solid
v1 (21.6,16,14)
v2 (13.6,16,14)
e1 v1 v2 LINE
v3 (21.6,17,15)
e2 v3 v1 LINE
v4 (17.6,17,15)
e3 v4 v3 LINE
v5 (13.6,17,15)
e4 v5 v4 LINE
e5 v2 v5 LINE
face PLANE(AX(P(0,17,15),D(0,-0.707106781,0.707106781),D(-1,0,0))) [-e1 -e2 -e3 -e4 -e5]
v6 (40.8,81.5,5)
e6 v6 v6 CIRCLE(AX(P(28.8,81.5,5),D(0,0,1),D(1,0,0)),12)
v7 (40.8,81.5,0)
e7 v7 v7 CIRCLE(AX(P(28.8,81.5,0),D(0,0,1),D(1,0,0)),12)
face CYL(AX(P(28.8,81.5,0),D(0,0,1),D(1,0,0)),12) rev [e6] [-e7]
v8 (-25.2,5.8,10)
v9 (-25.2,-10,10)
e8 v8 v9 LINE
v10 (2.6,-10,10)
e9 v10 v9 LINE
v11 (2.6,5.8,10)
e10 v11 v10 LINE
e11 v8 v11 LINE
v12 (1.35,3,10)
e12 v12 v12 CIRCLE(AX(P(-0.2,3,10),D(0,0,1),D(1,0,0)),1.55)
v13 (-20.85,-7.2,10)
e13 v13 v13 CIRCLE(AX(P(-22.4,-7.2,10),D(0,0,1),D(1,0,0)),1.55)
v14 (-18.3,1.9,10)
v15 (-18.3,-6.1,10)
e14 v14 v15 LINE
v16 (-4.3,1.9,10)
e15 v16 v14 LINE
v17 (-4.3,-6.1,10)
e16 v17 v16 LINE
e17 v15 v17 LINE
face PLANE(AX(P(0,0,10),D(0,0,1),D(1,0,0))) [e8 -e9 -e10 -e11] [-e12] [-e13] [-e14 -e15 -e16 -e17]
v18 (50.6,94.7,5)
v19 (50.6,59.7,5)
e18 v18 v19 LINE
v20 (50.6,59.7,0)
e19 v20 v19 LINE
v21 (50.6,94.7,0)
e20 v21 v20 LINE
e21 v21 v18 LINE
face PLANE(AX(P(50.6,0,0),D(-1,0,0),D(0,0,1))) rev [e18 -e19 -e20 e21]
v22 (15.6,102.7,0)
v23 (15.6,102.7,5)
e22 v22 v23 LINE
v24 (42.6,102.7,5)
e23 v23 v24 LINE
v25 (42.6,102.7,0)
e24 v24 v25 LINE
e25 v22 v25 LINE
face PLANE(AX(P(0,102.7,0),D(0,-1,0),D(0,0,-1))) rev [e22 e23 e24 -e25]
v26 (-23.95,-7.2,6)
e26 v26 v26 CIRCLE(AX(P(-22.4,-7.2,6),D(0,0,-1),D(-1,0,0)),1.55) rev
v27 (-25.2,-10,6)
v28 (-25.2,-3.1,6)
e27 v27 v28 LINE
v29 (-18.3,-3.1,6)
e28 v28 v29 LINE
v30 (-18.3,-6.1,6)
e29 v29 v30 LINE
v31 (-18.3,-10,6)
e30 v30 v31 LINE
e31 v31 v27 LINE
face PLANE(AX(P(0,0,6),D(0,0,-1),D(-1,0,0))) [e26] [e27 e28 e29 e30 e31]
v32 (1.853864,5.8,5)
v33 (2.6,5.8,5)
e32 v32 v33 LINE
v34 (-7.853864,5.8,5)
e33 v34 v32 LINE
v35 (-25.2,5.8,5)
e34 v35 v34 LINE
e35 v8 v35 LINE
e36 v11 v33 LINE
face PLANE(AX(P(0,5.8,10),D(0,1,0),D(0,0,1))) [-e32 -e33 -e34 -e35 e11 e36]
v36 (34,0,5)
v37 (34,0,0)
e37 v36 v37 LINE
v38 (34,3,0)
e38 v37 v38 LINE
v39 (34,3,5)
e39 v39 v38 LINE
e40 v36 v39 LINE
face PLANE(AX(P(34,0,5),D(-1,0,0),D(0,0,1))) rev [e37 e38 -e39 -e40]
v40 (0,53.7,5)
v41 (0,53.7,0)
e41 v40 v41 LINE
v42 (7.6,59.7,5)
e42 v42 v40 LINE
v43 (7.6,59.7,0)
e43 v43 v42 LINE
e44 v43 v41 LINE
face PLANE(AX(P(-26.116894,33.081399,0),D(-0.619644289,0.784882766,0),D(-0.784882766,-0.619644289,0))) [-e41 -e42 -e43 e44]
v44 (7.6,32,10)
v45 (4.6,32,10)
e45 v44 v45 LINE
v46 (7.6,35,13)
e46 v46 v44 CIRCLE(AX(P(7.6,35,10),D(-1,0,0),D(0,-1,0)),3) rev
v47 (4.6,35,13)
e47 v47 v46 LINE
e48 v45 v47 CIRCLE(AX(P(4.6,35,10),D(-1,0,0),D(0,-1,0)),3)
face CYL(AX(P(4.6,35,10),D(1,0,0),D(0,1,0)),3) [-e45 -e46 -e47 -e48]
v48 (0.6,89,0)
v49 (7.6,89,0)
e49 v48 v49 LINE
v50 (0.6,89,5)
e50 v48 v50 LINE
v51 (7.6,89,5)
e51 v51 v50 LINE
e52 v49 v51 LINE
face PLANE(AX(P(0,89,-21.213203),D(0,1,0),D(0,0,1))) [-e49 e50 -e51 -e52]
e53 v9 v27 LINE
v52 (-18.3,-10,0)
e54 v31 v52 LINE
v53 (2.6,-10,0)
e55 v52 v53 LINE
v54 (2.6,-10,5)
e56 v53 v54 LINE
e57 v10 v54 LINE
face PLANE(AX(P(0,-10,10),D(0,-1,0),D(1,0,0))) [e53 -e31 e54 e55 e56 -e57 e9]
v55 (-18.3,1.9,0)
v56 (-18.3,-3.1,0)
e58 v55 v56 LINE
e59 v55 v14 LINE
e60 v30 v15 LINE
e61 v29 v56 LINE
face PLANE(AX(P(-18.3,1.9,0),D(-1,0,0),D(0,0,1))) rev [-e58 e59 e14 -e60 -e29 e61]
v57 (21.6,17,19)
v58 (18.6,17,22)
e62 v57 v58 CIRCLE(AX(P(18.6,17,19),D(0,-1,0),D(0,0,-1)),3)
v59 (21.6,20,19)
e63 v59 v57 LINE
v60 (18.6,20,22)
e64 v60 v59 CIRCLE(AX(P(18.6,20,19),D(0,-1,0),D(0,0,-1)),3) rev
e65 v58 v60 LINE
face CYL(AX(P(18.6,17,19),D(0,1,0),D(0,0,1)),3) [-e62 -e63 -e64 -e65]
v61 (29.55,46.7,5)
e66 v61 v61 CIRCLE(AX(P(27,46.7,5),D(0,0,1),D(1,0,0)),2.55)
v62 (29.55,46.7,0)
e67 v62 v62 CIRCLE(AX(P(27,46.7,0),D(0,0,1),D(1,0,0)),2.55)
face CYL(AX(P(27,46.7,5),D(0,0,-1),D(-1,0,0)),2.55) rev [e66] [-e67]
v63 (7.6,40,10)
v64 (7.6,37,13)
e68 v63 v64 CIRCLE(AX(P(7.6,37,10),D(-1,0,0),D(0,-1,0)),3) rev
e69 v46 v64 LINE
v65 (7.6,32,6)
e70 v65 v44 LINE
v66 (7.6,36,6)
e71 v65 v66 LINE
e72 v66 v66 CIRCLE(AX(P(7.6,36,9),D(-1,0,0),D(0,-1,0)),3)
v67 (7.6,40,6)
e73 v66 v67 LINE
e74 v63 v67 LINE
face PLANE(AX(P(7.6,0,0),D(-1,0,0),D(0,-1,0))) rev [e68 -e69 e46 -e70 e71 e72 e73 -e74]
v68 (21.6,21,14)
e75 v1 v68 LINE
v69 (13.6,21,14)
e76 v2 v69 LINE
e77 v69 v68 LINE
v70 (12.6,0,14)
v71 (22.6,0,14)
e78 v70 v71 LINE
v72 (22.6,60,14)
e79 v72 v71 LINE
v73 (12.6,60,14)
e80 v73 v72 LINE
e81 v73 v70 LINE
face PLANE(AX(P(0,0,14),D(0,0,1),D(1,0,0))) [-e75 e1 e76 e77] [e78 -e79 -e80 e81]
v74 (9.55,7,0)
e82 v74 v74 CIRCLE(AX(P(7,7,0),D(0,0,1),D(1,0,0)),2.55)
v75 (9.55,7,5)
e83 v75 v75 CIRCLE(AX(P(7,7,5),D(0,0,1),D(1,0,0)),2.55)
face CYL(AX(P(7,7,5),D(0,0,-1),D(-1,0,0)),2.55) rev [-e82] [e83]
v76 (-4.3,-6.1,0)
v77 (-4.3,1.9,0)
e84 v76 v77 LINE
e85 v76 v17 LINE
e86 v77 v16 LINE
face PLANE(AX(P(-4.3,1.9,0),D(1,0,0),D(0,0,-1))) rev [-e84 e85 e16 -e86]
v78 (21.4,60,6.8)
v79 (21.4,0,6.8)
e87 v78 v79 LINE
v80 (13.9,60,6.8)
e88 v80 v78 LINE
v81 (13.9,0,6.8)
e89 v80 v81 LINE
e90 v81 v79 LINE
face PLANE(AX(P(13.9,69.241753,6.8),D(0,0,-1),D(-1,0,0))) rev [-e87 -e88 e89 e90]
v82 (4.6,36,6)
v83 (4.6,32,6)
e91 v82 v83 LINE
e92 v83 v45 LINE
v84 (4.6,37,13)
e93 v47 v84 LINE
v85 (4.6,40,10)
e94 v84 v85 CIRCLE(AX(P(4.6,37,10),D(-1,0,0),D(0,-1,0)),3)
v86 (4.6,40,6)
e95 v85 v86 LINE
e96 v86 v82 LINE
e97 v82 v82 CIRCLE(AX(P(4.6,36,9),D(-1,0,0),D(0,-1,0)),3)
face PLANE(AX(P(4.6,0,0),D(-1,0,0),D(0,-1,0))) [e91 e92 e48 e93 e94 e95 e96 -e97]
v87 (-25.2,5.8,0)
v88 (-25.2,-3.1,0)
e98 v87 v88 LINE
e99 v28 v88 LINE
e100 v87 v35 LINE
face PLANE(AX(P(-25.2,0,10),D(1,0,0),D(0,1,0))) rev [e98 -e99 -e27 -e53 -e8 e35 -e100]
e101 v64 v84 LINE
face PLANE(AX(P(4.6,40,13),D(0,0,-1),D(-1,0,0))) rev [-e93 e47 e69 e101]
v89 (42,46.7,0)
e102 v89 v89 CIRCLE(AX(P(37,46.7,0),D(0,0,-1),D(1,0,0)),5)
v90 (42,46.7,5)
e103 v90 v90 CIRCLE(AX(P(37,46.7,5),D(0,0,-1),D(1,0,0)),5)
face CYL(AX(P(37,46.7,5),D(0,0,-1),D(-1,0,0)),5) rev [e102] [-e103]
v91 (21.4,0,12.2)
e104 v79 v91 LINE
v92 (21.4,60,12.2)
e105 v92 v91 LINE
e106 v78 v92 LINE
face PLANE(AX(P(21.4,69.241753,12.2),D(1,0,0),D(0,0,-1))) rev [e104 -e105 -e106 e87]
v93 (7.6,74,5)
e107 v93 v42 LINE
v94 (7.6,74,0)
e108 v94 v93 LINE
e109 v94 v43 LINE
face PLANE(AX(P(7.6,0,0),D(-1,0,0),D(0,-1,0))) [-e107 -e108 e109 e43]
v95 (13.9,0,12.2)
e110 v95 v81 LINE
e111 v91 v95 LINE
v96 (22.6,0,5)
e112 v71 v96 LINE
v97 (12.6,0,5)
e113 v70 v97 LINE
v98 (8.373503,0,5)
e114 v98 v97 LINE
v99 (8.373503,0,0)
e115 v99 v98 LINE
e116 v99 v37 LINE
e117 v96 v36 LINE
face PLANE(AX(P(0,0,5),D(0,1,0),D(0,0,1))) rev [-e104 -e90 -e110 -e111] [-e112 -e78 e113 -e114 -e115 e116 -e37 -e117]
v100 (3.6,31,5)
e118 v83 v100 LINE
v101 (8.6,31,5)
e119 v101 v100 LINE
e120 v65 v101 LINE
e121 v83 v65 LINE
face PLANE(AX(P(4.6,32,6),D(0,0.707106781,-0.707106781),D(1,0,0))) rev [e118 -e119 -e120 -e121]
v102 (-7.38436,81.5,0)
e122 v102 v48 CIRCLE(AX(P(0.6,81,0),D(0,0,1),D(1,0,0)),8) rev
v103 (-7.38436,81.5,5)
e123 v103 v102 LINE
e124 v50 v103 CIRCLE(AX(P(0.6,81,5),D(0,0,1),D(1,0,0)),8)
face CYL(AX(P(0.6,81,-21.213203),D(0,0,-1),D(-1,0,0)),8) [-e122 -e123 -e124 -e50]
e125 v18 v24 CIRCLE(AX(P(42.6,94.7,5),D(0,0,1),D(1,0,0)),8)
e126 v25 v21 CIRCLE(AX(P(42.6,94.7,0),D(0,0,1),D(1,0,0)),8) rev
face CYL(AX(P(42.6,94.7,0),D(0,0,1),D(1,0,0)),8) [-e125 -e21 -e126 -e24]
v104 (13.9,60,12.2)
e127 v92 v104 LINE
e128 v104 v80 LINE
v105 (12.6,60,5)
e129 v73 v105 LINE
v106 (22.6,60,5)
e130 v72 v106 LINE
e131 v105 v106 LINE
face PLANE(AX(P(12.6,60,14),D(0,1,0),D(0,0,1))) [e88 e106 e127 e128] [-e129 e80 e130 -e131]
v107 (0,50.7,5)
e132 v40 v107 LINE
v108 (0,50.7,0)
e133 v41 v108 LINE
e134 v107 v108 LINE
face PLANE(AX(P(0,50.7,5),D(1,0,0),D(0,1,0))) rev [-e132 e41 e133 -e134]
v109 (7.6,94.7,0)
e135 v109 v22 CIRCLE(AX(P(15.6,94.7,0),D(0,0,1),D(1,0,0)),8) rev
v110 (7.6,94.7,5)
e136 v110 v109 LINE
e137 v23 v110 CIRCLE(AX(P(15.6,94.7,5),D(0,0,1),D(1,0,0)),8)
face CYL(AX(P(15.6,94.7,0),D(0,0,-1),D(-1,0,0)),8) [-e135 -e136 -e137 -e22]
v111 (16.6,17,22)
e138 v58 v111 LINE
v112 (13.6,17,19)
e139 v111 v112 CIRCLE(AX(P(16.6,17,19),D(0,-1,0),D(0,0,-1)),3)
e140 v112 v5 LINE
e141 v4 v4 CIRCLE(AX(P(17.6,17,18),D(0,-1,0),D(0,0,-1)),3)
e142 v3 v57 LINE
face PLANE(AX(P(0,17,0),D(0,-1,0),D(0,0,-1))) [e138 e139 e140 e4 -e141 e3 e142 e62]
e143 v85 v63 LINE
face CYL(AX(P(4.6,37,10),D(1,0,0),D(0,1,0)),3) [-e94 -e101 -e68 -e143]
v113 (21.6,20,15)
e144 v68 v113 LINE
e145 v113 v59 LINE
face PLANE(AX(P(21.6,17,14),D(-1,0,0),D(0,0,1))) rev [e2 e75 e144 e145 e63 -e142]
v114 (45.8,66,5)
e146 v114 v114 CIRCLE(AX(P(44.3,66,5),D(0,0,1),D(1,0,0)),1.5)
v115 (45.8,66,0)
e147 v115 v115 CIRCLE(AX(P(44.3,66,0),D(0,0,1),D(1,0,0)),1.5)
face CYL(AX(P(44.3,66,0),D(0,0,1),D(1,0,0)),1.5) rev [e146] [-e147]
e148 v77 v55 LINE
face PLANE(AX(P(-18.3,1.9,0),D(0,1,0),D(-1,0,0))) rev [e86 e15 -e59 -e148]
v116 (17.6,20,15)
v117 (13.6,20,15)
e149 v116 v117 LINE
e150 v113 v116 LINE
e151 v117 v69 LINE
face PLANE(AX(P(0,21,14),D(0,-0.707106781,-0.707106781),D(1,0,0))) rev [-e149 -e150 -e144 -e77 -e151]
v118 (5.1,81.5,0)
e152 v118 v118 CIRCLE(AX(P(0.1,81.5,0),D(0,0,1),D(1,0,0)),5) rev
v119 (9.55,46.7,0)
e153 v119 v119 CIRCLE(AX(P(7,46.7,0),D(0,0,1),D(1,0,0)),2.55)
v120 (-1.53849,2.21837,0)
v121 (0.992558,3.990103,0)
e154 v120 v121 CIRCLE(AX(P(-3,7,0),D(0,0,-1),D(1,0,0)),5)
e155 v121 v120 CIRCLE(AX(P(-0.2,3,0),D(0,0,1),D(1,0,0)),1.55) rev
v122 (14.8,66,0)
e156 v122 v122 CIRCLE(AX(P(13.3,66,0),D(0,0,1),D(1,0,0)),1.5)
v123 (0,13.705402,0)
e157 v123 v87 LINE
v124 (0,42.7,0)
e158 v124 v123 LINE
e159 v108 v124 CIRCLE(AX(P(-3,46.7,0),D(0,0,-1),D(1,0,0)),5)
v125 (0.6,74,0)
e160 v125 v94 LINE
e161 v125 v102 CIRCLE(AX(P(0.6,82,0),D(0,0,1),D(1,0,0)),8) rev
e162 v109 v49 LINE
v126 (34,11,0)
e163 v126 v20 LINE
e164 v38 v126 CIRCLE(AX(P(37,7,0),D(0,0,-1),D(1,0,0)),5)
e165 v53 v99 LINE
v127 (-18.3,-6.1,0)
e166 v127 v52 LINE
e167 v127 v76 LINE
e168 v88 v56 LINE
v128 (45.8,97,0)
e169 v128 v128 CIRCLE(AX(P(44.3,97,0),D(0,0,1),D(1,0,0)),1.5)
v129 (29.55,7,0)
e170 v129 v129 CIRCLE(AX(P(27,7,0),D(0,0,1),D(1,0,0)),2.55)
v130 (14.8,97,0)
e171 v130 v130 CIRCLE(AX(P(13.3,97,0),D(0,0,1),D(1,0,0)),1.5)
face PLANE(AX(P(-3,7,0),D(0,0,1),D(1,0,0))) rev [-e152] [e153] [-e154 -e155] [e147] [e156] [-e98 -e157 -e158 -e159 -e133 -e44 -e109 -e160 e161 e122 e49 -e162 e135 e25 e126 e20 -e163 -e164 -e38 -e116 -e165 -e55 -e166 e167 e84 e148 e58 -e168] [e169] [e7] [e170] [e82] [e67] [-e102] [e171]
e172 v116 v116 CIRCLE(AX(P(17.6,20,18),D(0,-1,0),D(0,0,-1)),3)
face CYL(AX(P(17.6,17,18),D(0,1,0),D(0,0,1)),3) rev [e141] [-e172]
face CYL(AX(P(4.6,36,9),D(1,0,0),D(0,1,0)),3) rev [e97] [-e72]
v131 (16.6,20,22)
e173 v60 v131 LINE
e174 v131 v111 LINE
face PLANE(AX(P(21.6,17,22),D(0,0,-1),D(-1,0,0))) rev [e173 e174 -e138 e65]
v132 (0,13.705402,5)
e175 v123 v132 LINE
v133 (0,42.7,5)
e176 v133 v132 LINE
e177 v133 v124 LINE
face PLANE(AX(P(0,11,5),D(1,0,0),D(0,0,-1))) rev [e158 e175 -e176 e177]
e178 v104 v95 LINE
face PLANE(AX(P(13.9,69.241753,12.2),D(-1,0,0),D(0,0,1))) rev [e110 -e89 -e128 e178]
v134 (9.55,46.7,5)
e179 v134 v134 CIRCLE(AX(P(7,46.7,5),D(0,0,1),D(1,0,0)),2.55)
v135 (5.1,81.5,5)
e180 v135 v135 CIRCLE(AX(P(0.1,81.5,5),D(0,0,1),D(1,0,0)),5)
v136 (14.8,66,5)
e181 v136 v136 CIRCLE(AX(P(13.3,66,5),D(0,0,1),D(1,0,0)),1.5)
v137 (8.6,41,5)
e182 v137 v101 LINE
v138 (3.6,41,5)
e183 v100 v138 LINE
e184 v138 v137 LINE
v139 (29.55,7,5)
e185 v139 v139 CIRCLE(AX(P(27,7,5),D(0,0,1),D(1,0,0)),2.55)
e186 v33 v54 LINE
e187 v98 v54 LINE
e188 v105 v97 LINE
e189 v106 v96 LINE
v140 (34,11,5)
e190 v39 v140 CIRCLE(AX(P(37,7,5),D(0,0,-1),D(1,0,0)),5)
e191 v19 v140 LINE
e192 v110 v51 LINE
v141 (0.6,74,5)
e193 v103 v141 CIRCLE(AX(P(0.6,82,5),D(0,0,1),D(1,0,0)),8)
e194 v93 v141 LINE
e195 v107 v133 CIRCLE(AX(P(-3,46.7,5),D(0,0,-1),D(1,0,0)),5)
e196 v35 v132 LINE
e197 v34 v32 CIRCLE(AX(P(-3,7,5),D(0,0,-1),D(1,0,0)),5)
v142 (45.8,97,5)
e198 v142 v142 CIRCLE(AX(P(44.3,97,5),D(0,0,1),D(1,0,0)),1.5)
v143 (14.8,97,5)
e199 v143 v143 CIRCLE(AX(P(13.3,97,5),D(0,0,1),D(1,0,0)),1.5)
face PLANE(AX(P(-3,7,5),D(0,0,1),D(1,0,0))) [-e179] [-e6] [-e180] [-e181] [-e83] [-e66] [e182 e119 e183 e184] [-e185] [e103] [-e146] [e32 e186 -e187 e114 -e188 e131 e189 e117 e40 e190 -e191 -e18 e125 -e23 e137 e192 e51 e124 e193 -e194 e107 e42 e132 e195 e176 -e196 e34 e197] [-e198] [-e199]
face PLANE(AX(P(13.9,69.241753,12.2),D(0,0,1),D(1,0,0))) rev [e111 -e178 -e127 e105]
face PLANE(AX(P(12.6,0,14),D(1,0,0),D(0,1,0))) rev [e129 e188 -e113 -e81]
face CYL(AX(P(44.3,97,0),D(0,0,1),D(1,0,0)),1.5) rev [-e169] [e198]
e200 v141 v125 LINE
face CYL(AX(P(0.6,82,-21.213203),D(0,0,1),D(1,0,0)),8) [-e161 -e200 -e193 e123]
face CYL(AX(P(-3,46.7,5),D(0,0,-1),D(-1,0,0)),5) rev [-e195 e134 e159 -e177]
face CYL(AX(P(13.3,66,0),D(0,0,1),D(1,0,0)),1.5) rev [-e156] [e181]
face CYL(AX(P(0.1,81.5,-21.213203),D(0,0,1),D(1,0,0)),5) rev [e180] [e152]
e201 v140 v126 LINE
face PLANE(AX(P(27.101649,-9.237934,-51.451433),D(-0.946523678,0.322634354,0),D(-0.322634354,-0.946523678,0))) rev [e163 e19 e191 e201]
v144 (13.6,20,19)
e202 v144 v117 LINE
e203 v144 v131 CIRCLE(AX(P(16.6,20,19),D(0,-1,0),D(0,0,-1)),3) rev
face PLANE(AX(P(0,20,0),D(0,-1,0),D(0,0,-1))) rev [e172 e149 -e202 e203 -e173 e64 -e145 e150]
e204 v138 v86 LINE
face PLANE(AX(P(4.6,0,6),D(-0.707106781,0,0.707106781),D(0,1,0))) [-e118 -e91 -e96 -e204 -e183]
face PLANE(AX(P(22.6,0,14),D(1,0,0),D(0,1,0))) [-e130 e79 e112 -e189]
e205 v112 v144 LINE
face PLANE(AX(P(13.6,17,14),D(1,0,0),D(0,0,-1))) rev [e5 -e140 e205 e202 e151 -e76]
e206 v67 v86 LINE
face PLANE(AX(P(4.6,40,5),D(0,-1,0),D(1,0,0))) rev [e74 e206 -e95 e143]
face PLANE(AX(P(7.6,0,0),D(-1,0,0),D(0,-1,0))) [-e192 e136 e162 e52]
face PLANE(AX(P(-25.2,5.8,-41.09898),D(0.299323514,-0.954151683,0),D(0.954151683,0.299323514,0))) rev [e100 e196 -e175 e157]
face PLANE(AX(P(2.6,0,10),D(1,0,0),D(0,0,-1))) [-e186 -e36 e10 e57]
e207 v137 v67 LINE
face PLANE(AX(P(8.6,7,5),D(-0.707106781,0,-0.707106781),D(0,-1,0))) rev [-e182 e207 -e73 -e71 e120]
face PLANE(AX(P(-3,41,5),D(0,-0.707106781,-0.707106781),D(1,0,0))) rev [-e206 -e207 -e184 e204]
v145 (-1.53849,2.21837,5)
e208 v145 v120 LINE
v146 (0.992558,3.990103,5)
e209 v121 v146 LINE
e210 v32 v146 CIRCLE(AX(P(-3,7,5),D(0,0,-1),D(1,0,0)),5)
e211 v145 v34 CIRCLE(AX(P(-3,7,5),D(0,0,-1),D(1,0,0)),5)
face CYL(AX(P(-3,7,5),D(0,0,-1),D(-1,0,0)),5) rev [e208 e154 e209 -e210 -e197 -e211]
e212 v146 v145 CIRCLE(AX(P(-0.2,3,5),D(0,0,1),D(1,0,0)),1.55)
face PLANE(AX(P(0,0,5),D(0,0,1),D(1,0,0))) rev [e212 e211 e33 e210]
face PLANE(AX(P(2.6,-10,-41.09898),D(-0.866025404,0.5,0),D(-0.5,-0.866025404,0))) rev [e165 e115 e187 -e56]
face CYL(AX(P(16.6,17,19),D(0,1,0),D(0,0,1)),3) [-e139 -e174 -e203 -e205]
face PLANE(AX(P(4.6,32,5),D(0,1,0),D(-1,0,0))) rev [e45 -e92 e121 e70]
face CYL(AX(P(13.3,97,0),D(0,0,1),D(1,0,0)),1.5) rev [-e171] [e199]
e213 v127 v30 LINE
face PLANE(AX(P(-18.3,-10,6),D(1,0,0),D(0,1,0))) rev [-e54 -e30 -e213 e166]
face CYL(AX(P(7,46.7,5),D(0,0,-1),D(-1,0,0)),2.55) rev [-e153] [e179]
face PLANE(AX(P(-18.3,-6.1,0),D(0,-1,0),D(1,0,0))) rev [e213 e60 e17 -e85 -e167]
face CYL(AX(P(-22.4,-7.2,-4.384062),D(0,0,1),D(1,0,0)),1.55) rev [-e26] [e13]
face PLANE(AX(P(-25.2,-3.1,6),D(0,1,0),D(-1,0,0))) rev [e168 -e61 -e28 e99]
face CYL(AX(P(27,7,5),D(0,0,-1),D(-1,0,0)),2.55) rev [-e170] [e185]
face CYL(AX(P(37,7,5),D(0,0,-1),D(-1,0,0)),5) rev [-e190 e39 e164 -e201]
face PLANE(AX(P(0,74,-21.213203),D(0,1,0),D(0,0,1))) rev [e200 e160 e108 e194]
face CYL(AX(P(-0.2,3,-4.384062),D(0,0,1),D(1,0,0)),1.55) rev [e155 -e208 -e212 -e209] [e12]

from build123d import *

# Parameters (mm, degrees)
SKETCH1_R            = 2.550000000000004
SKETCH1_R_2          = 2.5499999999999914
SKETCH1_R_3          = 2.5500000000000007
SKETCH1_R_4          = 2.550000000000003
BOSS_EXTRUDE1_DEPTH  = 5
BOSS_EXTRUDE2_DEPTH  = 9
BOSS_EXTRUDE3_DEPTH  = 5
BOSS_EXTRUDE4_DEPTH  = 5
SKETCH8_R            = 1.5000000000000009
SKETCH8_R_2          = 1.5000000000000042
SKETCH8_R_3          = 12.000000000000002
CUT_EXTRUDE3_DEPTH   = 115.84184777336179
BOSS_EXTRUDE5_START  = -5
BOSS_EXTRUDE5_DEPTH  = 5
FILLET1_R            = 8
BOSS_EXTRUDE7_START  = 5
BOSS_EXTRUDE7_DEPTH  = 5
CUT_EXTRUDE4_START   = -10
SKETCH12_R           = 1.5500000000000012
SKETCH12_R_2         = 1.5500000000000003
CUT_EXTRUDE4_DEPTH   = 10
SKETCH13_W           = 14.999999999999995
SKETCH13_H           = 15.000000000000043
SKETCH13_R           = 5.0000000000000036
BOSS_EXTRUDE8_DEPTH  = 5
FILLET2_R            = 8
CUT_EXTRUDE5_DEPTH   = 115.92454046025158
SKETCH15_W           = 7.5
SKETCH15_H           = 5.399999999999997
CUT_EXTRUDE6_DEPTH   = 60
SKETCH17_W           = 8
SKETCH17_H           = 7.999999999999998
SKETCH17_R           = 2.999999999999999
BOSS_EXTRUDE10_DEPTH = 3
FILLET4_R            = 3
CHAMFER1_SIZE        = 1
SKETCH18_W           = 8
SKETCH18_H           = 7.999999999999993
SKETCH18_R           = 3
BOSS_EXTRUDE11_DEPTH = 3
FILLET5_R            = 3
CHAMFER2_SIZE        = 1
CUT_EXTRUDE7_DEPTH   = 6


# Some blends are built 0.0001 mm under size
with BuildPart() as part:
    # Sketch1 → Boss-Extrude1 (new body)
    with BuildSketch(Plane.XY):
        with BuildLine():
            Line((0, 0), (33.99999999999999, 0))
            Line((33.99999999999999, 0), (33.99999999999999, 3.0000000000000107))
            ThreePointArc((33.99999999999999, 3.0000000000000107), (32.00000000000001, 7), (33.99999999999999, 10.99999999999999))
            Line((33.99999999999999, 10.99999999999999), (34, 42.7))
            ThreePointArc((34, 42.7), (32, 46.699999999999996), (34, 50.699999999999996))
            Line((34, 50.699999999999996), (34, 53.7))
            Line((34, 53.7), (0, 53.7))
            Line((0, 53.7), (-8.7e-16, 50.7))
            ThreePointArc((-8.7e-16, 50.7), (1.9999999999999938, 46.7), (-8.7e-16, 42.70000000000001))
            Line((-8.7e-16, 42.70000000000001), (-8.7e-16, 10.999999999999995))
            ThreePointArc((-8.7e-16, 10.999999999999995), (1.9999999999999973, 6.9999999999999964), (-8.7e-16, 2.9999999999999982))
            Line((-8.7e-16, 2.9999999999999982), (0, 0))
        make_face()
        with Locations((6.999999999999999, 46.7)):
            Circle(SKETCH1_R, mode=Mode.SUBTRACT)
        with Locations((27, 46.70000000000002)):
            Circle(SKETCH1_R_2, mode=Mode.SUBTRACT)
        with Locations((6.999999999999999, 6.999999999999997)):
            Circle(SKETCH1_R_3, mode=Mode.SUBTRACT)
        with Locations((27.000000000000004, 6.999999999999999)):
            Circle(SKETCH1_R_4, mode=Mode.SUBTRACT)
    extrude(amount=BOSS_EXTRUDE1_DEPTH)

    # Sketch2 → Boss-Extrude2 (add)
    with BuildSketch(Plane.XY.offset(5)):
        Polygon((22.599999999999994, 60), (22.6, 0), (12.600000000000001, 0), (12.599999999999998, 60), align=None)
    extrude(amount=BOSS_EXTRUDE2_DEPTH)

    # Sketch3 → Boss-Extrude3 (add)
    with BuildSketch(Plane.XY.offset(5)):
        Polygon((2.5999999999999983, 5.799999999999998), (2.5999999999999983, -10), (-25.200000000000003, -10.000000000000004), (-25.200000000000006, 5.799999999999998), align=None)
    extrude(amount=BOSS_EXTRUDE3_DEPTH)

    # Sketch6 → Boss-Extrude4 (add, through all)
    with BuildSketch(Plane.XY.offset(5)):
        Polygon((50.6, 102.70000000000002), (7.6, 102.70000000000002), (7.600000000000005, 59.70000000000002), (50.60000000000001, 59.70000000000002), align=None)
        Polygon((50.60000000000001, 59.70000000000002), (7.600000000000005, 59.70000000000002), (0, 53.7), (34, 53.7), align=None)
    extrude(amount=-BOSS_EXTRUDE4_DEPTH)

    # Sketch8 → Cut-Extrude3 (cut, through all)
    with BuildSketch(Plane.XY.offset(5)):
        with Locations((13.299999999999999, 97.00000000000001)):
            Circle(SKETCH8_R)
        with Locations((44.3, 97.00000000000001)):
            Circle(SKETCH8_R_2)
        with Locations((13.300000000000002, 66.00000000000001)):
            Circle(SKETCH8_R)
        with Locations((44.3, 66.00000000000001)):
            Circle(SKETCH8_R_2)
        with Locations((28.8, 81.50000000000001)):
            Circle(SKETCH8_R_3)
    extrude(amount=-CUT_EXTRUDE3_DEPTH, mode=Mode.SUBTRACT)

    # Sketch9 → Boss-Extrude5 (add)
    with BuildSketch(Plane.XY.offset(5).offset(BOSS_EXTRUDE5_START)):
        with BuildLine():
            Line((33.99999999999999, 10.999999999999986), (50.6, 59.70000000000002))
            Line((50.6, 59.70000000000002), (34, 53.7))
            Line((34, 53.7), (34, 50.699999999999996))
            ThreePointArc((34, 50.699999999999996), (39.236067977499786, 51.172135954999575), (42, 46.699999999999996))
            ThreePointArc((42, 46.699999999999996), (39.236067977499786, 42.227864045000416), (34, 42.7))
            Line((34, 42.7), (33.99999999999999, 10.99999999999999))
        make_face()
    extrude(amount=BOSS_EXTRUDE5_DEPTH)

    # Fillet1
    fillet1_edges = [part.edges().sort_by_distance(p)[0] for p in [
        (50.6, 102.70000000000002, 2.5),
        (7.6, 102.70000000000002, 2.5),
    ]]
    fillet(fillet1_edges, radius=FILLET1_R)

    # Sketch11 → Boss-Extrude7 (add)
    with BuildSketch(Plane(origin=(0, 0, 5), x_dir=(-1, 0, 0), z_dir=(0, 0, -1)).offset(BOSS_EXTRUDE7_START)):
        with BuildLine():
            Line((-2.5999999999999983, -10), (-8.37350269189618, 0))
            Line((-8.37350269189618, 0), (0, 0))
            Line((0, 0), (3.47e-15, 2.9999999999999982))
            ThreePointArc((3.47e-15, 2.9999999999999982), (7.999999999999998, 6.9999999999999964), (8.7e-16, 10.999999999999995))
            Line((8.7e-16, 10.999999999999995), (3.52e-15, 13.705401938363094))
            Line((3.52e-15, 13.705401938363094), (25.200000000000006, 5.799999999999998))
            Line((25.200000000000006, 5.799999999999998), (25.200000000000003, -10.000000000000004))
            Line((25.200000000000003, -10.000000000000004), (-2.5999999999999983, -10))
        make_face()
    extrude(amount=-BOSS_EXTRUDE7_DEPTH)

    # Sketch12 → Cut-Extrude4 (cut)
    with BuildSketch(Plane.XY.offset(10).offset(CUT_EXTRUDE4_START)):
        with Locations((-22.400000000000006, -7.2)):
            Circle(SKETCH12_R)
        with Locations((-0.20000000000000182, 2.999999999999998)):
            Circle(SKETCH12_R_2)
    extrude(amount=CUT_EXTRUDE4_DEPTH, mode=Mode.SUBTRACT)

    # Sketch13 → Boss-Extrude8 (add)
    with BuildSketch(Plane.XY.offset(5)):
        with Locations((0.09999999999999964, 81.50000000000003)):
            Rectangle(SKETCH13_W, SKETCH13_H)
        with Locations((0.09999999999999969, 81.50000000000001)):
            Circle(SKETCH13_R, mode=Mode.SUBTRACT)
    extrude(amount=-BOSS_EXTRUDE8_DEPTH)

    # Fillet2
    # the kernel refuses this fillet: 8 mm, written as the material it takes off along each edge
    with BuildSketch(Plane(origin=(-7.399999999999999, 74, 25), x_dir=(1, 0, 0), z_dir=(0, 0, -1))) as fillet2_piece_1:
        with BuildLine():
            CenterArc((FILLET2_R, -FILLET2_R), FILLET2_R, 90, 90)
            Line((-8.9e-16, -FILLET2_R), (0, 0))
            Line((0, 0), (FILLET2_R, 0))
        make_face()
    extrude(amount=45, mode=Mode.SUBTRACT)
    with BuildSketch(Plane(origin=(-7.399999999999999, 89.00000000000004, 25), x_dir=(1, 0, 0), z_dir=(0, 0, -1))) as fillet2_piece_2:
        with BuildLine():
            CenterArc((FILLET2_R, FILLET2_R), FILLET2_R, 180, 90)
            Line((-8.9e-16, FILLET2_R), (0, 0))
            Line((0, 0), (FILLET2_R, 0))
        make_face()
    extrude(amount=45, mode=Mode.SUBTRACT)

    # Sketch14 → Cut-Extrude5 (cut, through all)
    with BuildSketch(Plane.XY.offset(10)):
        Polygon((-18.300000000000004, 1.8999999999999955), (-4.300000000000003, 1.8999999999999972), (-4.300000000000003, -6.1), (-18.300000000000004, -6.100000000000001), align=None)
    extrude(amount=-CUT_EXTRUDE5_DEPTH, mode=Mode.SUBTRACT)

    # Sketch15 → Cut-Extrude6 (cut)
    with BuildSketch(Plane.XZ):
        with Locations((17.65, 9.5)):
            Rectangle(SKETCH15_W, SKETCH15_H)
    extrude(amount=-CUT_EXTRUDE6_DEPTH, mode=Mode.SUBTRACT)

    # Sketch17 → Boss-Extrude10 (add)
    with BuildSketch(Plane(origin=(0, 20, 0), x_dir=(-1, 0, 0), z_dir=(0, -1, 0))):
        with Locations((-17.6, -18)):
            Rectangle(SKETCH17_W, SKETCH17_H)
        with Locations(Location((-17.6, -18, 0), (0, 0, 90))):
            Circle(SKETCH17_R, mode=Mode.SUBTRACT)
    extrude(amount=BOSS_EXTRUDE10_DEPTH)

    # Fillet4
    fillet4_edges = [part.edges().sort_by_distance(p)[0] for p in [
        (21.6, 18.5, 22),
        (13.600000000000001, 18.5, 22),
    ]]
    fillet(fillet4_edges, radius=FILLET4_R)

    # Chamfer1
    chamfer1_edges = [part.edges().sort_by_distance(p)[0] for p in [
        (17.6, 17, 14.000000000000002),
        (17.6, 20, 14.000000000000002),
    ]]
    chamfer(chamfer1_edges, length=CHAMFER1_SIZE - 0.0001)  # a hair under: the kernel refuses the full size

    # Sketch18 → Boss-Extrude11 (add)
    with BuildSketch(Plane.ZY.offset(-7.600000000000001)):
        with Locations((9.000000000000002, 35.999999999999986)):
            Rectangle(SKETCH18_W, SKETCH18_H)
        with Locations(Location((9.000000000000002, 35.99999999999999, 0), (0, 0, 270))):
            Circle(SKETCH18_R, mode=Mode.SUBTRACT)
    extrude(amount=BOSS_EXTRUDE11_DEPTH)

    # Fillet5
    fillet5_edges = [part.edges().sort_by_distance(p)[0] for p in [
        (6.1, 31.999999999999993, 13.000000000000002),
        (6.099999999999999, 39.999999999999986, 13.000000000000002),
    ]]
    fillet(fillet5_edges, radius=FILLET5_R)

    # Chamfer2
    chamfer2_edges = [part.edges().sort_by_distance(p)[0] for p in [
        (4.6, 35.999999999999986, 5.000000000000001),
        (7.6, 35.999999999999986, 5.000000000000001),
        (6.099999999999999, 39.999999999999986, 5.000000000000001),
        (6.1, 31.999999999999993, 5.000000000000001),
    ]]
    chamfer(chamfer2_edges, length=CHAMFER2_SIZE)

    # Sketch19 → Cut-Extrude7 (cut)
    with BuildSketch(Plane(origin=(0, 0, 0), x_dir=(-1, 0, 0), z_dir=(0, 0, -1))):
        Polygon((25.200000000000003, -10.000000000000004), (18.300000000000004, -10.000000000000004), (18.300000000000008, -3.1000000000000036), (25.200000000000006, -3.1000000000000028), align=None)
    extrude(amount=-CUT_EXTRUDE7_DEPTH, mode=Mode.SUBTRACT)


solid = part.part
